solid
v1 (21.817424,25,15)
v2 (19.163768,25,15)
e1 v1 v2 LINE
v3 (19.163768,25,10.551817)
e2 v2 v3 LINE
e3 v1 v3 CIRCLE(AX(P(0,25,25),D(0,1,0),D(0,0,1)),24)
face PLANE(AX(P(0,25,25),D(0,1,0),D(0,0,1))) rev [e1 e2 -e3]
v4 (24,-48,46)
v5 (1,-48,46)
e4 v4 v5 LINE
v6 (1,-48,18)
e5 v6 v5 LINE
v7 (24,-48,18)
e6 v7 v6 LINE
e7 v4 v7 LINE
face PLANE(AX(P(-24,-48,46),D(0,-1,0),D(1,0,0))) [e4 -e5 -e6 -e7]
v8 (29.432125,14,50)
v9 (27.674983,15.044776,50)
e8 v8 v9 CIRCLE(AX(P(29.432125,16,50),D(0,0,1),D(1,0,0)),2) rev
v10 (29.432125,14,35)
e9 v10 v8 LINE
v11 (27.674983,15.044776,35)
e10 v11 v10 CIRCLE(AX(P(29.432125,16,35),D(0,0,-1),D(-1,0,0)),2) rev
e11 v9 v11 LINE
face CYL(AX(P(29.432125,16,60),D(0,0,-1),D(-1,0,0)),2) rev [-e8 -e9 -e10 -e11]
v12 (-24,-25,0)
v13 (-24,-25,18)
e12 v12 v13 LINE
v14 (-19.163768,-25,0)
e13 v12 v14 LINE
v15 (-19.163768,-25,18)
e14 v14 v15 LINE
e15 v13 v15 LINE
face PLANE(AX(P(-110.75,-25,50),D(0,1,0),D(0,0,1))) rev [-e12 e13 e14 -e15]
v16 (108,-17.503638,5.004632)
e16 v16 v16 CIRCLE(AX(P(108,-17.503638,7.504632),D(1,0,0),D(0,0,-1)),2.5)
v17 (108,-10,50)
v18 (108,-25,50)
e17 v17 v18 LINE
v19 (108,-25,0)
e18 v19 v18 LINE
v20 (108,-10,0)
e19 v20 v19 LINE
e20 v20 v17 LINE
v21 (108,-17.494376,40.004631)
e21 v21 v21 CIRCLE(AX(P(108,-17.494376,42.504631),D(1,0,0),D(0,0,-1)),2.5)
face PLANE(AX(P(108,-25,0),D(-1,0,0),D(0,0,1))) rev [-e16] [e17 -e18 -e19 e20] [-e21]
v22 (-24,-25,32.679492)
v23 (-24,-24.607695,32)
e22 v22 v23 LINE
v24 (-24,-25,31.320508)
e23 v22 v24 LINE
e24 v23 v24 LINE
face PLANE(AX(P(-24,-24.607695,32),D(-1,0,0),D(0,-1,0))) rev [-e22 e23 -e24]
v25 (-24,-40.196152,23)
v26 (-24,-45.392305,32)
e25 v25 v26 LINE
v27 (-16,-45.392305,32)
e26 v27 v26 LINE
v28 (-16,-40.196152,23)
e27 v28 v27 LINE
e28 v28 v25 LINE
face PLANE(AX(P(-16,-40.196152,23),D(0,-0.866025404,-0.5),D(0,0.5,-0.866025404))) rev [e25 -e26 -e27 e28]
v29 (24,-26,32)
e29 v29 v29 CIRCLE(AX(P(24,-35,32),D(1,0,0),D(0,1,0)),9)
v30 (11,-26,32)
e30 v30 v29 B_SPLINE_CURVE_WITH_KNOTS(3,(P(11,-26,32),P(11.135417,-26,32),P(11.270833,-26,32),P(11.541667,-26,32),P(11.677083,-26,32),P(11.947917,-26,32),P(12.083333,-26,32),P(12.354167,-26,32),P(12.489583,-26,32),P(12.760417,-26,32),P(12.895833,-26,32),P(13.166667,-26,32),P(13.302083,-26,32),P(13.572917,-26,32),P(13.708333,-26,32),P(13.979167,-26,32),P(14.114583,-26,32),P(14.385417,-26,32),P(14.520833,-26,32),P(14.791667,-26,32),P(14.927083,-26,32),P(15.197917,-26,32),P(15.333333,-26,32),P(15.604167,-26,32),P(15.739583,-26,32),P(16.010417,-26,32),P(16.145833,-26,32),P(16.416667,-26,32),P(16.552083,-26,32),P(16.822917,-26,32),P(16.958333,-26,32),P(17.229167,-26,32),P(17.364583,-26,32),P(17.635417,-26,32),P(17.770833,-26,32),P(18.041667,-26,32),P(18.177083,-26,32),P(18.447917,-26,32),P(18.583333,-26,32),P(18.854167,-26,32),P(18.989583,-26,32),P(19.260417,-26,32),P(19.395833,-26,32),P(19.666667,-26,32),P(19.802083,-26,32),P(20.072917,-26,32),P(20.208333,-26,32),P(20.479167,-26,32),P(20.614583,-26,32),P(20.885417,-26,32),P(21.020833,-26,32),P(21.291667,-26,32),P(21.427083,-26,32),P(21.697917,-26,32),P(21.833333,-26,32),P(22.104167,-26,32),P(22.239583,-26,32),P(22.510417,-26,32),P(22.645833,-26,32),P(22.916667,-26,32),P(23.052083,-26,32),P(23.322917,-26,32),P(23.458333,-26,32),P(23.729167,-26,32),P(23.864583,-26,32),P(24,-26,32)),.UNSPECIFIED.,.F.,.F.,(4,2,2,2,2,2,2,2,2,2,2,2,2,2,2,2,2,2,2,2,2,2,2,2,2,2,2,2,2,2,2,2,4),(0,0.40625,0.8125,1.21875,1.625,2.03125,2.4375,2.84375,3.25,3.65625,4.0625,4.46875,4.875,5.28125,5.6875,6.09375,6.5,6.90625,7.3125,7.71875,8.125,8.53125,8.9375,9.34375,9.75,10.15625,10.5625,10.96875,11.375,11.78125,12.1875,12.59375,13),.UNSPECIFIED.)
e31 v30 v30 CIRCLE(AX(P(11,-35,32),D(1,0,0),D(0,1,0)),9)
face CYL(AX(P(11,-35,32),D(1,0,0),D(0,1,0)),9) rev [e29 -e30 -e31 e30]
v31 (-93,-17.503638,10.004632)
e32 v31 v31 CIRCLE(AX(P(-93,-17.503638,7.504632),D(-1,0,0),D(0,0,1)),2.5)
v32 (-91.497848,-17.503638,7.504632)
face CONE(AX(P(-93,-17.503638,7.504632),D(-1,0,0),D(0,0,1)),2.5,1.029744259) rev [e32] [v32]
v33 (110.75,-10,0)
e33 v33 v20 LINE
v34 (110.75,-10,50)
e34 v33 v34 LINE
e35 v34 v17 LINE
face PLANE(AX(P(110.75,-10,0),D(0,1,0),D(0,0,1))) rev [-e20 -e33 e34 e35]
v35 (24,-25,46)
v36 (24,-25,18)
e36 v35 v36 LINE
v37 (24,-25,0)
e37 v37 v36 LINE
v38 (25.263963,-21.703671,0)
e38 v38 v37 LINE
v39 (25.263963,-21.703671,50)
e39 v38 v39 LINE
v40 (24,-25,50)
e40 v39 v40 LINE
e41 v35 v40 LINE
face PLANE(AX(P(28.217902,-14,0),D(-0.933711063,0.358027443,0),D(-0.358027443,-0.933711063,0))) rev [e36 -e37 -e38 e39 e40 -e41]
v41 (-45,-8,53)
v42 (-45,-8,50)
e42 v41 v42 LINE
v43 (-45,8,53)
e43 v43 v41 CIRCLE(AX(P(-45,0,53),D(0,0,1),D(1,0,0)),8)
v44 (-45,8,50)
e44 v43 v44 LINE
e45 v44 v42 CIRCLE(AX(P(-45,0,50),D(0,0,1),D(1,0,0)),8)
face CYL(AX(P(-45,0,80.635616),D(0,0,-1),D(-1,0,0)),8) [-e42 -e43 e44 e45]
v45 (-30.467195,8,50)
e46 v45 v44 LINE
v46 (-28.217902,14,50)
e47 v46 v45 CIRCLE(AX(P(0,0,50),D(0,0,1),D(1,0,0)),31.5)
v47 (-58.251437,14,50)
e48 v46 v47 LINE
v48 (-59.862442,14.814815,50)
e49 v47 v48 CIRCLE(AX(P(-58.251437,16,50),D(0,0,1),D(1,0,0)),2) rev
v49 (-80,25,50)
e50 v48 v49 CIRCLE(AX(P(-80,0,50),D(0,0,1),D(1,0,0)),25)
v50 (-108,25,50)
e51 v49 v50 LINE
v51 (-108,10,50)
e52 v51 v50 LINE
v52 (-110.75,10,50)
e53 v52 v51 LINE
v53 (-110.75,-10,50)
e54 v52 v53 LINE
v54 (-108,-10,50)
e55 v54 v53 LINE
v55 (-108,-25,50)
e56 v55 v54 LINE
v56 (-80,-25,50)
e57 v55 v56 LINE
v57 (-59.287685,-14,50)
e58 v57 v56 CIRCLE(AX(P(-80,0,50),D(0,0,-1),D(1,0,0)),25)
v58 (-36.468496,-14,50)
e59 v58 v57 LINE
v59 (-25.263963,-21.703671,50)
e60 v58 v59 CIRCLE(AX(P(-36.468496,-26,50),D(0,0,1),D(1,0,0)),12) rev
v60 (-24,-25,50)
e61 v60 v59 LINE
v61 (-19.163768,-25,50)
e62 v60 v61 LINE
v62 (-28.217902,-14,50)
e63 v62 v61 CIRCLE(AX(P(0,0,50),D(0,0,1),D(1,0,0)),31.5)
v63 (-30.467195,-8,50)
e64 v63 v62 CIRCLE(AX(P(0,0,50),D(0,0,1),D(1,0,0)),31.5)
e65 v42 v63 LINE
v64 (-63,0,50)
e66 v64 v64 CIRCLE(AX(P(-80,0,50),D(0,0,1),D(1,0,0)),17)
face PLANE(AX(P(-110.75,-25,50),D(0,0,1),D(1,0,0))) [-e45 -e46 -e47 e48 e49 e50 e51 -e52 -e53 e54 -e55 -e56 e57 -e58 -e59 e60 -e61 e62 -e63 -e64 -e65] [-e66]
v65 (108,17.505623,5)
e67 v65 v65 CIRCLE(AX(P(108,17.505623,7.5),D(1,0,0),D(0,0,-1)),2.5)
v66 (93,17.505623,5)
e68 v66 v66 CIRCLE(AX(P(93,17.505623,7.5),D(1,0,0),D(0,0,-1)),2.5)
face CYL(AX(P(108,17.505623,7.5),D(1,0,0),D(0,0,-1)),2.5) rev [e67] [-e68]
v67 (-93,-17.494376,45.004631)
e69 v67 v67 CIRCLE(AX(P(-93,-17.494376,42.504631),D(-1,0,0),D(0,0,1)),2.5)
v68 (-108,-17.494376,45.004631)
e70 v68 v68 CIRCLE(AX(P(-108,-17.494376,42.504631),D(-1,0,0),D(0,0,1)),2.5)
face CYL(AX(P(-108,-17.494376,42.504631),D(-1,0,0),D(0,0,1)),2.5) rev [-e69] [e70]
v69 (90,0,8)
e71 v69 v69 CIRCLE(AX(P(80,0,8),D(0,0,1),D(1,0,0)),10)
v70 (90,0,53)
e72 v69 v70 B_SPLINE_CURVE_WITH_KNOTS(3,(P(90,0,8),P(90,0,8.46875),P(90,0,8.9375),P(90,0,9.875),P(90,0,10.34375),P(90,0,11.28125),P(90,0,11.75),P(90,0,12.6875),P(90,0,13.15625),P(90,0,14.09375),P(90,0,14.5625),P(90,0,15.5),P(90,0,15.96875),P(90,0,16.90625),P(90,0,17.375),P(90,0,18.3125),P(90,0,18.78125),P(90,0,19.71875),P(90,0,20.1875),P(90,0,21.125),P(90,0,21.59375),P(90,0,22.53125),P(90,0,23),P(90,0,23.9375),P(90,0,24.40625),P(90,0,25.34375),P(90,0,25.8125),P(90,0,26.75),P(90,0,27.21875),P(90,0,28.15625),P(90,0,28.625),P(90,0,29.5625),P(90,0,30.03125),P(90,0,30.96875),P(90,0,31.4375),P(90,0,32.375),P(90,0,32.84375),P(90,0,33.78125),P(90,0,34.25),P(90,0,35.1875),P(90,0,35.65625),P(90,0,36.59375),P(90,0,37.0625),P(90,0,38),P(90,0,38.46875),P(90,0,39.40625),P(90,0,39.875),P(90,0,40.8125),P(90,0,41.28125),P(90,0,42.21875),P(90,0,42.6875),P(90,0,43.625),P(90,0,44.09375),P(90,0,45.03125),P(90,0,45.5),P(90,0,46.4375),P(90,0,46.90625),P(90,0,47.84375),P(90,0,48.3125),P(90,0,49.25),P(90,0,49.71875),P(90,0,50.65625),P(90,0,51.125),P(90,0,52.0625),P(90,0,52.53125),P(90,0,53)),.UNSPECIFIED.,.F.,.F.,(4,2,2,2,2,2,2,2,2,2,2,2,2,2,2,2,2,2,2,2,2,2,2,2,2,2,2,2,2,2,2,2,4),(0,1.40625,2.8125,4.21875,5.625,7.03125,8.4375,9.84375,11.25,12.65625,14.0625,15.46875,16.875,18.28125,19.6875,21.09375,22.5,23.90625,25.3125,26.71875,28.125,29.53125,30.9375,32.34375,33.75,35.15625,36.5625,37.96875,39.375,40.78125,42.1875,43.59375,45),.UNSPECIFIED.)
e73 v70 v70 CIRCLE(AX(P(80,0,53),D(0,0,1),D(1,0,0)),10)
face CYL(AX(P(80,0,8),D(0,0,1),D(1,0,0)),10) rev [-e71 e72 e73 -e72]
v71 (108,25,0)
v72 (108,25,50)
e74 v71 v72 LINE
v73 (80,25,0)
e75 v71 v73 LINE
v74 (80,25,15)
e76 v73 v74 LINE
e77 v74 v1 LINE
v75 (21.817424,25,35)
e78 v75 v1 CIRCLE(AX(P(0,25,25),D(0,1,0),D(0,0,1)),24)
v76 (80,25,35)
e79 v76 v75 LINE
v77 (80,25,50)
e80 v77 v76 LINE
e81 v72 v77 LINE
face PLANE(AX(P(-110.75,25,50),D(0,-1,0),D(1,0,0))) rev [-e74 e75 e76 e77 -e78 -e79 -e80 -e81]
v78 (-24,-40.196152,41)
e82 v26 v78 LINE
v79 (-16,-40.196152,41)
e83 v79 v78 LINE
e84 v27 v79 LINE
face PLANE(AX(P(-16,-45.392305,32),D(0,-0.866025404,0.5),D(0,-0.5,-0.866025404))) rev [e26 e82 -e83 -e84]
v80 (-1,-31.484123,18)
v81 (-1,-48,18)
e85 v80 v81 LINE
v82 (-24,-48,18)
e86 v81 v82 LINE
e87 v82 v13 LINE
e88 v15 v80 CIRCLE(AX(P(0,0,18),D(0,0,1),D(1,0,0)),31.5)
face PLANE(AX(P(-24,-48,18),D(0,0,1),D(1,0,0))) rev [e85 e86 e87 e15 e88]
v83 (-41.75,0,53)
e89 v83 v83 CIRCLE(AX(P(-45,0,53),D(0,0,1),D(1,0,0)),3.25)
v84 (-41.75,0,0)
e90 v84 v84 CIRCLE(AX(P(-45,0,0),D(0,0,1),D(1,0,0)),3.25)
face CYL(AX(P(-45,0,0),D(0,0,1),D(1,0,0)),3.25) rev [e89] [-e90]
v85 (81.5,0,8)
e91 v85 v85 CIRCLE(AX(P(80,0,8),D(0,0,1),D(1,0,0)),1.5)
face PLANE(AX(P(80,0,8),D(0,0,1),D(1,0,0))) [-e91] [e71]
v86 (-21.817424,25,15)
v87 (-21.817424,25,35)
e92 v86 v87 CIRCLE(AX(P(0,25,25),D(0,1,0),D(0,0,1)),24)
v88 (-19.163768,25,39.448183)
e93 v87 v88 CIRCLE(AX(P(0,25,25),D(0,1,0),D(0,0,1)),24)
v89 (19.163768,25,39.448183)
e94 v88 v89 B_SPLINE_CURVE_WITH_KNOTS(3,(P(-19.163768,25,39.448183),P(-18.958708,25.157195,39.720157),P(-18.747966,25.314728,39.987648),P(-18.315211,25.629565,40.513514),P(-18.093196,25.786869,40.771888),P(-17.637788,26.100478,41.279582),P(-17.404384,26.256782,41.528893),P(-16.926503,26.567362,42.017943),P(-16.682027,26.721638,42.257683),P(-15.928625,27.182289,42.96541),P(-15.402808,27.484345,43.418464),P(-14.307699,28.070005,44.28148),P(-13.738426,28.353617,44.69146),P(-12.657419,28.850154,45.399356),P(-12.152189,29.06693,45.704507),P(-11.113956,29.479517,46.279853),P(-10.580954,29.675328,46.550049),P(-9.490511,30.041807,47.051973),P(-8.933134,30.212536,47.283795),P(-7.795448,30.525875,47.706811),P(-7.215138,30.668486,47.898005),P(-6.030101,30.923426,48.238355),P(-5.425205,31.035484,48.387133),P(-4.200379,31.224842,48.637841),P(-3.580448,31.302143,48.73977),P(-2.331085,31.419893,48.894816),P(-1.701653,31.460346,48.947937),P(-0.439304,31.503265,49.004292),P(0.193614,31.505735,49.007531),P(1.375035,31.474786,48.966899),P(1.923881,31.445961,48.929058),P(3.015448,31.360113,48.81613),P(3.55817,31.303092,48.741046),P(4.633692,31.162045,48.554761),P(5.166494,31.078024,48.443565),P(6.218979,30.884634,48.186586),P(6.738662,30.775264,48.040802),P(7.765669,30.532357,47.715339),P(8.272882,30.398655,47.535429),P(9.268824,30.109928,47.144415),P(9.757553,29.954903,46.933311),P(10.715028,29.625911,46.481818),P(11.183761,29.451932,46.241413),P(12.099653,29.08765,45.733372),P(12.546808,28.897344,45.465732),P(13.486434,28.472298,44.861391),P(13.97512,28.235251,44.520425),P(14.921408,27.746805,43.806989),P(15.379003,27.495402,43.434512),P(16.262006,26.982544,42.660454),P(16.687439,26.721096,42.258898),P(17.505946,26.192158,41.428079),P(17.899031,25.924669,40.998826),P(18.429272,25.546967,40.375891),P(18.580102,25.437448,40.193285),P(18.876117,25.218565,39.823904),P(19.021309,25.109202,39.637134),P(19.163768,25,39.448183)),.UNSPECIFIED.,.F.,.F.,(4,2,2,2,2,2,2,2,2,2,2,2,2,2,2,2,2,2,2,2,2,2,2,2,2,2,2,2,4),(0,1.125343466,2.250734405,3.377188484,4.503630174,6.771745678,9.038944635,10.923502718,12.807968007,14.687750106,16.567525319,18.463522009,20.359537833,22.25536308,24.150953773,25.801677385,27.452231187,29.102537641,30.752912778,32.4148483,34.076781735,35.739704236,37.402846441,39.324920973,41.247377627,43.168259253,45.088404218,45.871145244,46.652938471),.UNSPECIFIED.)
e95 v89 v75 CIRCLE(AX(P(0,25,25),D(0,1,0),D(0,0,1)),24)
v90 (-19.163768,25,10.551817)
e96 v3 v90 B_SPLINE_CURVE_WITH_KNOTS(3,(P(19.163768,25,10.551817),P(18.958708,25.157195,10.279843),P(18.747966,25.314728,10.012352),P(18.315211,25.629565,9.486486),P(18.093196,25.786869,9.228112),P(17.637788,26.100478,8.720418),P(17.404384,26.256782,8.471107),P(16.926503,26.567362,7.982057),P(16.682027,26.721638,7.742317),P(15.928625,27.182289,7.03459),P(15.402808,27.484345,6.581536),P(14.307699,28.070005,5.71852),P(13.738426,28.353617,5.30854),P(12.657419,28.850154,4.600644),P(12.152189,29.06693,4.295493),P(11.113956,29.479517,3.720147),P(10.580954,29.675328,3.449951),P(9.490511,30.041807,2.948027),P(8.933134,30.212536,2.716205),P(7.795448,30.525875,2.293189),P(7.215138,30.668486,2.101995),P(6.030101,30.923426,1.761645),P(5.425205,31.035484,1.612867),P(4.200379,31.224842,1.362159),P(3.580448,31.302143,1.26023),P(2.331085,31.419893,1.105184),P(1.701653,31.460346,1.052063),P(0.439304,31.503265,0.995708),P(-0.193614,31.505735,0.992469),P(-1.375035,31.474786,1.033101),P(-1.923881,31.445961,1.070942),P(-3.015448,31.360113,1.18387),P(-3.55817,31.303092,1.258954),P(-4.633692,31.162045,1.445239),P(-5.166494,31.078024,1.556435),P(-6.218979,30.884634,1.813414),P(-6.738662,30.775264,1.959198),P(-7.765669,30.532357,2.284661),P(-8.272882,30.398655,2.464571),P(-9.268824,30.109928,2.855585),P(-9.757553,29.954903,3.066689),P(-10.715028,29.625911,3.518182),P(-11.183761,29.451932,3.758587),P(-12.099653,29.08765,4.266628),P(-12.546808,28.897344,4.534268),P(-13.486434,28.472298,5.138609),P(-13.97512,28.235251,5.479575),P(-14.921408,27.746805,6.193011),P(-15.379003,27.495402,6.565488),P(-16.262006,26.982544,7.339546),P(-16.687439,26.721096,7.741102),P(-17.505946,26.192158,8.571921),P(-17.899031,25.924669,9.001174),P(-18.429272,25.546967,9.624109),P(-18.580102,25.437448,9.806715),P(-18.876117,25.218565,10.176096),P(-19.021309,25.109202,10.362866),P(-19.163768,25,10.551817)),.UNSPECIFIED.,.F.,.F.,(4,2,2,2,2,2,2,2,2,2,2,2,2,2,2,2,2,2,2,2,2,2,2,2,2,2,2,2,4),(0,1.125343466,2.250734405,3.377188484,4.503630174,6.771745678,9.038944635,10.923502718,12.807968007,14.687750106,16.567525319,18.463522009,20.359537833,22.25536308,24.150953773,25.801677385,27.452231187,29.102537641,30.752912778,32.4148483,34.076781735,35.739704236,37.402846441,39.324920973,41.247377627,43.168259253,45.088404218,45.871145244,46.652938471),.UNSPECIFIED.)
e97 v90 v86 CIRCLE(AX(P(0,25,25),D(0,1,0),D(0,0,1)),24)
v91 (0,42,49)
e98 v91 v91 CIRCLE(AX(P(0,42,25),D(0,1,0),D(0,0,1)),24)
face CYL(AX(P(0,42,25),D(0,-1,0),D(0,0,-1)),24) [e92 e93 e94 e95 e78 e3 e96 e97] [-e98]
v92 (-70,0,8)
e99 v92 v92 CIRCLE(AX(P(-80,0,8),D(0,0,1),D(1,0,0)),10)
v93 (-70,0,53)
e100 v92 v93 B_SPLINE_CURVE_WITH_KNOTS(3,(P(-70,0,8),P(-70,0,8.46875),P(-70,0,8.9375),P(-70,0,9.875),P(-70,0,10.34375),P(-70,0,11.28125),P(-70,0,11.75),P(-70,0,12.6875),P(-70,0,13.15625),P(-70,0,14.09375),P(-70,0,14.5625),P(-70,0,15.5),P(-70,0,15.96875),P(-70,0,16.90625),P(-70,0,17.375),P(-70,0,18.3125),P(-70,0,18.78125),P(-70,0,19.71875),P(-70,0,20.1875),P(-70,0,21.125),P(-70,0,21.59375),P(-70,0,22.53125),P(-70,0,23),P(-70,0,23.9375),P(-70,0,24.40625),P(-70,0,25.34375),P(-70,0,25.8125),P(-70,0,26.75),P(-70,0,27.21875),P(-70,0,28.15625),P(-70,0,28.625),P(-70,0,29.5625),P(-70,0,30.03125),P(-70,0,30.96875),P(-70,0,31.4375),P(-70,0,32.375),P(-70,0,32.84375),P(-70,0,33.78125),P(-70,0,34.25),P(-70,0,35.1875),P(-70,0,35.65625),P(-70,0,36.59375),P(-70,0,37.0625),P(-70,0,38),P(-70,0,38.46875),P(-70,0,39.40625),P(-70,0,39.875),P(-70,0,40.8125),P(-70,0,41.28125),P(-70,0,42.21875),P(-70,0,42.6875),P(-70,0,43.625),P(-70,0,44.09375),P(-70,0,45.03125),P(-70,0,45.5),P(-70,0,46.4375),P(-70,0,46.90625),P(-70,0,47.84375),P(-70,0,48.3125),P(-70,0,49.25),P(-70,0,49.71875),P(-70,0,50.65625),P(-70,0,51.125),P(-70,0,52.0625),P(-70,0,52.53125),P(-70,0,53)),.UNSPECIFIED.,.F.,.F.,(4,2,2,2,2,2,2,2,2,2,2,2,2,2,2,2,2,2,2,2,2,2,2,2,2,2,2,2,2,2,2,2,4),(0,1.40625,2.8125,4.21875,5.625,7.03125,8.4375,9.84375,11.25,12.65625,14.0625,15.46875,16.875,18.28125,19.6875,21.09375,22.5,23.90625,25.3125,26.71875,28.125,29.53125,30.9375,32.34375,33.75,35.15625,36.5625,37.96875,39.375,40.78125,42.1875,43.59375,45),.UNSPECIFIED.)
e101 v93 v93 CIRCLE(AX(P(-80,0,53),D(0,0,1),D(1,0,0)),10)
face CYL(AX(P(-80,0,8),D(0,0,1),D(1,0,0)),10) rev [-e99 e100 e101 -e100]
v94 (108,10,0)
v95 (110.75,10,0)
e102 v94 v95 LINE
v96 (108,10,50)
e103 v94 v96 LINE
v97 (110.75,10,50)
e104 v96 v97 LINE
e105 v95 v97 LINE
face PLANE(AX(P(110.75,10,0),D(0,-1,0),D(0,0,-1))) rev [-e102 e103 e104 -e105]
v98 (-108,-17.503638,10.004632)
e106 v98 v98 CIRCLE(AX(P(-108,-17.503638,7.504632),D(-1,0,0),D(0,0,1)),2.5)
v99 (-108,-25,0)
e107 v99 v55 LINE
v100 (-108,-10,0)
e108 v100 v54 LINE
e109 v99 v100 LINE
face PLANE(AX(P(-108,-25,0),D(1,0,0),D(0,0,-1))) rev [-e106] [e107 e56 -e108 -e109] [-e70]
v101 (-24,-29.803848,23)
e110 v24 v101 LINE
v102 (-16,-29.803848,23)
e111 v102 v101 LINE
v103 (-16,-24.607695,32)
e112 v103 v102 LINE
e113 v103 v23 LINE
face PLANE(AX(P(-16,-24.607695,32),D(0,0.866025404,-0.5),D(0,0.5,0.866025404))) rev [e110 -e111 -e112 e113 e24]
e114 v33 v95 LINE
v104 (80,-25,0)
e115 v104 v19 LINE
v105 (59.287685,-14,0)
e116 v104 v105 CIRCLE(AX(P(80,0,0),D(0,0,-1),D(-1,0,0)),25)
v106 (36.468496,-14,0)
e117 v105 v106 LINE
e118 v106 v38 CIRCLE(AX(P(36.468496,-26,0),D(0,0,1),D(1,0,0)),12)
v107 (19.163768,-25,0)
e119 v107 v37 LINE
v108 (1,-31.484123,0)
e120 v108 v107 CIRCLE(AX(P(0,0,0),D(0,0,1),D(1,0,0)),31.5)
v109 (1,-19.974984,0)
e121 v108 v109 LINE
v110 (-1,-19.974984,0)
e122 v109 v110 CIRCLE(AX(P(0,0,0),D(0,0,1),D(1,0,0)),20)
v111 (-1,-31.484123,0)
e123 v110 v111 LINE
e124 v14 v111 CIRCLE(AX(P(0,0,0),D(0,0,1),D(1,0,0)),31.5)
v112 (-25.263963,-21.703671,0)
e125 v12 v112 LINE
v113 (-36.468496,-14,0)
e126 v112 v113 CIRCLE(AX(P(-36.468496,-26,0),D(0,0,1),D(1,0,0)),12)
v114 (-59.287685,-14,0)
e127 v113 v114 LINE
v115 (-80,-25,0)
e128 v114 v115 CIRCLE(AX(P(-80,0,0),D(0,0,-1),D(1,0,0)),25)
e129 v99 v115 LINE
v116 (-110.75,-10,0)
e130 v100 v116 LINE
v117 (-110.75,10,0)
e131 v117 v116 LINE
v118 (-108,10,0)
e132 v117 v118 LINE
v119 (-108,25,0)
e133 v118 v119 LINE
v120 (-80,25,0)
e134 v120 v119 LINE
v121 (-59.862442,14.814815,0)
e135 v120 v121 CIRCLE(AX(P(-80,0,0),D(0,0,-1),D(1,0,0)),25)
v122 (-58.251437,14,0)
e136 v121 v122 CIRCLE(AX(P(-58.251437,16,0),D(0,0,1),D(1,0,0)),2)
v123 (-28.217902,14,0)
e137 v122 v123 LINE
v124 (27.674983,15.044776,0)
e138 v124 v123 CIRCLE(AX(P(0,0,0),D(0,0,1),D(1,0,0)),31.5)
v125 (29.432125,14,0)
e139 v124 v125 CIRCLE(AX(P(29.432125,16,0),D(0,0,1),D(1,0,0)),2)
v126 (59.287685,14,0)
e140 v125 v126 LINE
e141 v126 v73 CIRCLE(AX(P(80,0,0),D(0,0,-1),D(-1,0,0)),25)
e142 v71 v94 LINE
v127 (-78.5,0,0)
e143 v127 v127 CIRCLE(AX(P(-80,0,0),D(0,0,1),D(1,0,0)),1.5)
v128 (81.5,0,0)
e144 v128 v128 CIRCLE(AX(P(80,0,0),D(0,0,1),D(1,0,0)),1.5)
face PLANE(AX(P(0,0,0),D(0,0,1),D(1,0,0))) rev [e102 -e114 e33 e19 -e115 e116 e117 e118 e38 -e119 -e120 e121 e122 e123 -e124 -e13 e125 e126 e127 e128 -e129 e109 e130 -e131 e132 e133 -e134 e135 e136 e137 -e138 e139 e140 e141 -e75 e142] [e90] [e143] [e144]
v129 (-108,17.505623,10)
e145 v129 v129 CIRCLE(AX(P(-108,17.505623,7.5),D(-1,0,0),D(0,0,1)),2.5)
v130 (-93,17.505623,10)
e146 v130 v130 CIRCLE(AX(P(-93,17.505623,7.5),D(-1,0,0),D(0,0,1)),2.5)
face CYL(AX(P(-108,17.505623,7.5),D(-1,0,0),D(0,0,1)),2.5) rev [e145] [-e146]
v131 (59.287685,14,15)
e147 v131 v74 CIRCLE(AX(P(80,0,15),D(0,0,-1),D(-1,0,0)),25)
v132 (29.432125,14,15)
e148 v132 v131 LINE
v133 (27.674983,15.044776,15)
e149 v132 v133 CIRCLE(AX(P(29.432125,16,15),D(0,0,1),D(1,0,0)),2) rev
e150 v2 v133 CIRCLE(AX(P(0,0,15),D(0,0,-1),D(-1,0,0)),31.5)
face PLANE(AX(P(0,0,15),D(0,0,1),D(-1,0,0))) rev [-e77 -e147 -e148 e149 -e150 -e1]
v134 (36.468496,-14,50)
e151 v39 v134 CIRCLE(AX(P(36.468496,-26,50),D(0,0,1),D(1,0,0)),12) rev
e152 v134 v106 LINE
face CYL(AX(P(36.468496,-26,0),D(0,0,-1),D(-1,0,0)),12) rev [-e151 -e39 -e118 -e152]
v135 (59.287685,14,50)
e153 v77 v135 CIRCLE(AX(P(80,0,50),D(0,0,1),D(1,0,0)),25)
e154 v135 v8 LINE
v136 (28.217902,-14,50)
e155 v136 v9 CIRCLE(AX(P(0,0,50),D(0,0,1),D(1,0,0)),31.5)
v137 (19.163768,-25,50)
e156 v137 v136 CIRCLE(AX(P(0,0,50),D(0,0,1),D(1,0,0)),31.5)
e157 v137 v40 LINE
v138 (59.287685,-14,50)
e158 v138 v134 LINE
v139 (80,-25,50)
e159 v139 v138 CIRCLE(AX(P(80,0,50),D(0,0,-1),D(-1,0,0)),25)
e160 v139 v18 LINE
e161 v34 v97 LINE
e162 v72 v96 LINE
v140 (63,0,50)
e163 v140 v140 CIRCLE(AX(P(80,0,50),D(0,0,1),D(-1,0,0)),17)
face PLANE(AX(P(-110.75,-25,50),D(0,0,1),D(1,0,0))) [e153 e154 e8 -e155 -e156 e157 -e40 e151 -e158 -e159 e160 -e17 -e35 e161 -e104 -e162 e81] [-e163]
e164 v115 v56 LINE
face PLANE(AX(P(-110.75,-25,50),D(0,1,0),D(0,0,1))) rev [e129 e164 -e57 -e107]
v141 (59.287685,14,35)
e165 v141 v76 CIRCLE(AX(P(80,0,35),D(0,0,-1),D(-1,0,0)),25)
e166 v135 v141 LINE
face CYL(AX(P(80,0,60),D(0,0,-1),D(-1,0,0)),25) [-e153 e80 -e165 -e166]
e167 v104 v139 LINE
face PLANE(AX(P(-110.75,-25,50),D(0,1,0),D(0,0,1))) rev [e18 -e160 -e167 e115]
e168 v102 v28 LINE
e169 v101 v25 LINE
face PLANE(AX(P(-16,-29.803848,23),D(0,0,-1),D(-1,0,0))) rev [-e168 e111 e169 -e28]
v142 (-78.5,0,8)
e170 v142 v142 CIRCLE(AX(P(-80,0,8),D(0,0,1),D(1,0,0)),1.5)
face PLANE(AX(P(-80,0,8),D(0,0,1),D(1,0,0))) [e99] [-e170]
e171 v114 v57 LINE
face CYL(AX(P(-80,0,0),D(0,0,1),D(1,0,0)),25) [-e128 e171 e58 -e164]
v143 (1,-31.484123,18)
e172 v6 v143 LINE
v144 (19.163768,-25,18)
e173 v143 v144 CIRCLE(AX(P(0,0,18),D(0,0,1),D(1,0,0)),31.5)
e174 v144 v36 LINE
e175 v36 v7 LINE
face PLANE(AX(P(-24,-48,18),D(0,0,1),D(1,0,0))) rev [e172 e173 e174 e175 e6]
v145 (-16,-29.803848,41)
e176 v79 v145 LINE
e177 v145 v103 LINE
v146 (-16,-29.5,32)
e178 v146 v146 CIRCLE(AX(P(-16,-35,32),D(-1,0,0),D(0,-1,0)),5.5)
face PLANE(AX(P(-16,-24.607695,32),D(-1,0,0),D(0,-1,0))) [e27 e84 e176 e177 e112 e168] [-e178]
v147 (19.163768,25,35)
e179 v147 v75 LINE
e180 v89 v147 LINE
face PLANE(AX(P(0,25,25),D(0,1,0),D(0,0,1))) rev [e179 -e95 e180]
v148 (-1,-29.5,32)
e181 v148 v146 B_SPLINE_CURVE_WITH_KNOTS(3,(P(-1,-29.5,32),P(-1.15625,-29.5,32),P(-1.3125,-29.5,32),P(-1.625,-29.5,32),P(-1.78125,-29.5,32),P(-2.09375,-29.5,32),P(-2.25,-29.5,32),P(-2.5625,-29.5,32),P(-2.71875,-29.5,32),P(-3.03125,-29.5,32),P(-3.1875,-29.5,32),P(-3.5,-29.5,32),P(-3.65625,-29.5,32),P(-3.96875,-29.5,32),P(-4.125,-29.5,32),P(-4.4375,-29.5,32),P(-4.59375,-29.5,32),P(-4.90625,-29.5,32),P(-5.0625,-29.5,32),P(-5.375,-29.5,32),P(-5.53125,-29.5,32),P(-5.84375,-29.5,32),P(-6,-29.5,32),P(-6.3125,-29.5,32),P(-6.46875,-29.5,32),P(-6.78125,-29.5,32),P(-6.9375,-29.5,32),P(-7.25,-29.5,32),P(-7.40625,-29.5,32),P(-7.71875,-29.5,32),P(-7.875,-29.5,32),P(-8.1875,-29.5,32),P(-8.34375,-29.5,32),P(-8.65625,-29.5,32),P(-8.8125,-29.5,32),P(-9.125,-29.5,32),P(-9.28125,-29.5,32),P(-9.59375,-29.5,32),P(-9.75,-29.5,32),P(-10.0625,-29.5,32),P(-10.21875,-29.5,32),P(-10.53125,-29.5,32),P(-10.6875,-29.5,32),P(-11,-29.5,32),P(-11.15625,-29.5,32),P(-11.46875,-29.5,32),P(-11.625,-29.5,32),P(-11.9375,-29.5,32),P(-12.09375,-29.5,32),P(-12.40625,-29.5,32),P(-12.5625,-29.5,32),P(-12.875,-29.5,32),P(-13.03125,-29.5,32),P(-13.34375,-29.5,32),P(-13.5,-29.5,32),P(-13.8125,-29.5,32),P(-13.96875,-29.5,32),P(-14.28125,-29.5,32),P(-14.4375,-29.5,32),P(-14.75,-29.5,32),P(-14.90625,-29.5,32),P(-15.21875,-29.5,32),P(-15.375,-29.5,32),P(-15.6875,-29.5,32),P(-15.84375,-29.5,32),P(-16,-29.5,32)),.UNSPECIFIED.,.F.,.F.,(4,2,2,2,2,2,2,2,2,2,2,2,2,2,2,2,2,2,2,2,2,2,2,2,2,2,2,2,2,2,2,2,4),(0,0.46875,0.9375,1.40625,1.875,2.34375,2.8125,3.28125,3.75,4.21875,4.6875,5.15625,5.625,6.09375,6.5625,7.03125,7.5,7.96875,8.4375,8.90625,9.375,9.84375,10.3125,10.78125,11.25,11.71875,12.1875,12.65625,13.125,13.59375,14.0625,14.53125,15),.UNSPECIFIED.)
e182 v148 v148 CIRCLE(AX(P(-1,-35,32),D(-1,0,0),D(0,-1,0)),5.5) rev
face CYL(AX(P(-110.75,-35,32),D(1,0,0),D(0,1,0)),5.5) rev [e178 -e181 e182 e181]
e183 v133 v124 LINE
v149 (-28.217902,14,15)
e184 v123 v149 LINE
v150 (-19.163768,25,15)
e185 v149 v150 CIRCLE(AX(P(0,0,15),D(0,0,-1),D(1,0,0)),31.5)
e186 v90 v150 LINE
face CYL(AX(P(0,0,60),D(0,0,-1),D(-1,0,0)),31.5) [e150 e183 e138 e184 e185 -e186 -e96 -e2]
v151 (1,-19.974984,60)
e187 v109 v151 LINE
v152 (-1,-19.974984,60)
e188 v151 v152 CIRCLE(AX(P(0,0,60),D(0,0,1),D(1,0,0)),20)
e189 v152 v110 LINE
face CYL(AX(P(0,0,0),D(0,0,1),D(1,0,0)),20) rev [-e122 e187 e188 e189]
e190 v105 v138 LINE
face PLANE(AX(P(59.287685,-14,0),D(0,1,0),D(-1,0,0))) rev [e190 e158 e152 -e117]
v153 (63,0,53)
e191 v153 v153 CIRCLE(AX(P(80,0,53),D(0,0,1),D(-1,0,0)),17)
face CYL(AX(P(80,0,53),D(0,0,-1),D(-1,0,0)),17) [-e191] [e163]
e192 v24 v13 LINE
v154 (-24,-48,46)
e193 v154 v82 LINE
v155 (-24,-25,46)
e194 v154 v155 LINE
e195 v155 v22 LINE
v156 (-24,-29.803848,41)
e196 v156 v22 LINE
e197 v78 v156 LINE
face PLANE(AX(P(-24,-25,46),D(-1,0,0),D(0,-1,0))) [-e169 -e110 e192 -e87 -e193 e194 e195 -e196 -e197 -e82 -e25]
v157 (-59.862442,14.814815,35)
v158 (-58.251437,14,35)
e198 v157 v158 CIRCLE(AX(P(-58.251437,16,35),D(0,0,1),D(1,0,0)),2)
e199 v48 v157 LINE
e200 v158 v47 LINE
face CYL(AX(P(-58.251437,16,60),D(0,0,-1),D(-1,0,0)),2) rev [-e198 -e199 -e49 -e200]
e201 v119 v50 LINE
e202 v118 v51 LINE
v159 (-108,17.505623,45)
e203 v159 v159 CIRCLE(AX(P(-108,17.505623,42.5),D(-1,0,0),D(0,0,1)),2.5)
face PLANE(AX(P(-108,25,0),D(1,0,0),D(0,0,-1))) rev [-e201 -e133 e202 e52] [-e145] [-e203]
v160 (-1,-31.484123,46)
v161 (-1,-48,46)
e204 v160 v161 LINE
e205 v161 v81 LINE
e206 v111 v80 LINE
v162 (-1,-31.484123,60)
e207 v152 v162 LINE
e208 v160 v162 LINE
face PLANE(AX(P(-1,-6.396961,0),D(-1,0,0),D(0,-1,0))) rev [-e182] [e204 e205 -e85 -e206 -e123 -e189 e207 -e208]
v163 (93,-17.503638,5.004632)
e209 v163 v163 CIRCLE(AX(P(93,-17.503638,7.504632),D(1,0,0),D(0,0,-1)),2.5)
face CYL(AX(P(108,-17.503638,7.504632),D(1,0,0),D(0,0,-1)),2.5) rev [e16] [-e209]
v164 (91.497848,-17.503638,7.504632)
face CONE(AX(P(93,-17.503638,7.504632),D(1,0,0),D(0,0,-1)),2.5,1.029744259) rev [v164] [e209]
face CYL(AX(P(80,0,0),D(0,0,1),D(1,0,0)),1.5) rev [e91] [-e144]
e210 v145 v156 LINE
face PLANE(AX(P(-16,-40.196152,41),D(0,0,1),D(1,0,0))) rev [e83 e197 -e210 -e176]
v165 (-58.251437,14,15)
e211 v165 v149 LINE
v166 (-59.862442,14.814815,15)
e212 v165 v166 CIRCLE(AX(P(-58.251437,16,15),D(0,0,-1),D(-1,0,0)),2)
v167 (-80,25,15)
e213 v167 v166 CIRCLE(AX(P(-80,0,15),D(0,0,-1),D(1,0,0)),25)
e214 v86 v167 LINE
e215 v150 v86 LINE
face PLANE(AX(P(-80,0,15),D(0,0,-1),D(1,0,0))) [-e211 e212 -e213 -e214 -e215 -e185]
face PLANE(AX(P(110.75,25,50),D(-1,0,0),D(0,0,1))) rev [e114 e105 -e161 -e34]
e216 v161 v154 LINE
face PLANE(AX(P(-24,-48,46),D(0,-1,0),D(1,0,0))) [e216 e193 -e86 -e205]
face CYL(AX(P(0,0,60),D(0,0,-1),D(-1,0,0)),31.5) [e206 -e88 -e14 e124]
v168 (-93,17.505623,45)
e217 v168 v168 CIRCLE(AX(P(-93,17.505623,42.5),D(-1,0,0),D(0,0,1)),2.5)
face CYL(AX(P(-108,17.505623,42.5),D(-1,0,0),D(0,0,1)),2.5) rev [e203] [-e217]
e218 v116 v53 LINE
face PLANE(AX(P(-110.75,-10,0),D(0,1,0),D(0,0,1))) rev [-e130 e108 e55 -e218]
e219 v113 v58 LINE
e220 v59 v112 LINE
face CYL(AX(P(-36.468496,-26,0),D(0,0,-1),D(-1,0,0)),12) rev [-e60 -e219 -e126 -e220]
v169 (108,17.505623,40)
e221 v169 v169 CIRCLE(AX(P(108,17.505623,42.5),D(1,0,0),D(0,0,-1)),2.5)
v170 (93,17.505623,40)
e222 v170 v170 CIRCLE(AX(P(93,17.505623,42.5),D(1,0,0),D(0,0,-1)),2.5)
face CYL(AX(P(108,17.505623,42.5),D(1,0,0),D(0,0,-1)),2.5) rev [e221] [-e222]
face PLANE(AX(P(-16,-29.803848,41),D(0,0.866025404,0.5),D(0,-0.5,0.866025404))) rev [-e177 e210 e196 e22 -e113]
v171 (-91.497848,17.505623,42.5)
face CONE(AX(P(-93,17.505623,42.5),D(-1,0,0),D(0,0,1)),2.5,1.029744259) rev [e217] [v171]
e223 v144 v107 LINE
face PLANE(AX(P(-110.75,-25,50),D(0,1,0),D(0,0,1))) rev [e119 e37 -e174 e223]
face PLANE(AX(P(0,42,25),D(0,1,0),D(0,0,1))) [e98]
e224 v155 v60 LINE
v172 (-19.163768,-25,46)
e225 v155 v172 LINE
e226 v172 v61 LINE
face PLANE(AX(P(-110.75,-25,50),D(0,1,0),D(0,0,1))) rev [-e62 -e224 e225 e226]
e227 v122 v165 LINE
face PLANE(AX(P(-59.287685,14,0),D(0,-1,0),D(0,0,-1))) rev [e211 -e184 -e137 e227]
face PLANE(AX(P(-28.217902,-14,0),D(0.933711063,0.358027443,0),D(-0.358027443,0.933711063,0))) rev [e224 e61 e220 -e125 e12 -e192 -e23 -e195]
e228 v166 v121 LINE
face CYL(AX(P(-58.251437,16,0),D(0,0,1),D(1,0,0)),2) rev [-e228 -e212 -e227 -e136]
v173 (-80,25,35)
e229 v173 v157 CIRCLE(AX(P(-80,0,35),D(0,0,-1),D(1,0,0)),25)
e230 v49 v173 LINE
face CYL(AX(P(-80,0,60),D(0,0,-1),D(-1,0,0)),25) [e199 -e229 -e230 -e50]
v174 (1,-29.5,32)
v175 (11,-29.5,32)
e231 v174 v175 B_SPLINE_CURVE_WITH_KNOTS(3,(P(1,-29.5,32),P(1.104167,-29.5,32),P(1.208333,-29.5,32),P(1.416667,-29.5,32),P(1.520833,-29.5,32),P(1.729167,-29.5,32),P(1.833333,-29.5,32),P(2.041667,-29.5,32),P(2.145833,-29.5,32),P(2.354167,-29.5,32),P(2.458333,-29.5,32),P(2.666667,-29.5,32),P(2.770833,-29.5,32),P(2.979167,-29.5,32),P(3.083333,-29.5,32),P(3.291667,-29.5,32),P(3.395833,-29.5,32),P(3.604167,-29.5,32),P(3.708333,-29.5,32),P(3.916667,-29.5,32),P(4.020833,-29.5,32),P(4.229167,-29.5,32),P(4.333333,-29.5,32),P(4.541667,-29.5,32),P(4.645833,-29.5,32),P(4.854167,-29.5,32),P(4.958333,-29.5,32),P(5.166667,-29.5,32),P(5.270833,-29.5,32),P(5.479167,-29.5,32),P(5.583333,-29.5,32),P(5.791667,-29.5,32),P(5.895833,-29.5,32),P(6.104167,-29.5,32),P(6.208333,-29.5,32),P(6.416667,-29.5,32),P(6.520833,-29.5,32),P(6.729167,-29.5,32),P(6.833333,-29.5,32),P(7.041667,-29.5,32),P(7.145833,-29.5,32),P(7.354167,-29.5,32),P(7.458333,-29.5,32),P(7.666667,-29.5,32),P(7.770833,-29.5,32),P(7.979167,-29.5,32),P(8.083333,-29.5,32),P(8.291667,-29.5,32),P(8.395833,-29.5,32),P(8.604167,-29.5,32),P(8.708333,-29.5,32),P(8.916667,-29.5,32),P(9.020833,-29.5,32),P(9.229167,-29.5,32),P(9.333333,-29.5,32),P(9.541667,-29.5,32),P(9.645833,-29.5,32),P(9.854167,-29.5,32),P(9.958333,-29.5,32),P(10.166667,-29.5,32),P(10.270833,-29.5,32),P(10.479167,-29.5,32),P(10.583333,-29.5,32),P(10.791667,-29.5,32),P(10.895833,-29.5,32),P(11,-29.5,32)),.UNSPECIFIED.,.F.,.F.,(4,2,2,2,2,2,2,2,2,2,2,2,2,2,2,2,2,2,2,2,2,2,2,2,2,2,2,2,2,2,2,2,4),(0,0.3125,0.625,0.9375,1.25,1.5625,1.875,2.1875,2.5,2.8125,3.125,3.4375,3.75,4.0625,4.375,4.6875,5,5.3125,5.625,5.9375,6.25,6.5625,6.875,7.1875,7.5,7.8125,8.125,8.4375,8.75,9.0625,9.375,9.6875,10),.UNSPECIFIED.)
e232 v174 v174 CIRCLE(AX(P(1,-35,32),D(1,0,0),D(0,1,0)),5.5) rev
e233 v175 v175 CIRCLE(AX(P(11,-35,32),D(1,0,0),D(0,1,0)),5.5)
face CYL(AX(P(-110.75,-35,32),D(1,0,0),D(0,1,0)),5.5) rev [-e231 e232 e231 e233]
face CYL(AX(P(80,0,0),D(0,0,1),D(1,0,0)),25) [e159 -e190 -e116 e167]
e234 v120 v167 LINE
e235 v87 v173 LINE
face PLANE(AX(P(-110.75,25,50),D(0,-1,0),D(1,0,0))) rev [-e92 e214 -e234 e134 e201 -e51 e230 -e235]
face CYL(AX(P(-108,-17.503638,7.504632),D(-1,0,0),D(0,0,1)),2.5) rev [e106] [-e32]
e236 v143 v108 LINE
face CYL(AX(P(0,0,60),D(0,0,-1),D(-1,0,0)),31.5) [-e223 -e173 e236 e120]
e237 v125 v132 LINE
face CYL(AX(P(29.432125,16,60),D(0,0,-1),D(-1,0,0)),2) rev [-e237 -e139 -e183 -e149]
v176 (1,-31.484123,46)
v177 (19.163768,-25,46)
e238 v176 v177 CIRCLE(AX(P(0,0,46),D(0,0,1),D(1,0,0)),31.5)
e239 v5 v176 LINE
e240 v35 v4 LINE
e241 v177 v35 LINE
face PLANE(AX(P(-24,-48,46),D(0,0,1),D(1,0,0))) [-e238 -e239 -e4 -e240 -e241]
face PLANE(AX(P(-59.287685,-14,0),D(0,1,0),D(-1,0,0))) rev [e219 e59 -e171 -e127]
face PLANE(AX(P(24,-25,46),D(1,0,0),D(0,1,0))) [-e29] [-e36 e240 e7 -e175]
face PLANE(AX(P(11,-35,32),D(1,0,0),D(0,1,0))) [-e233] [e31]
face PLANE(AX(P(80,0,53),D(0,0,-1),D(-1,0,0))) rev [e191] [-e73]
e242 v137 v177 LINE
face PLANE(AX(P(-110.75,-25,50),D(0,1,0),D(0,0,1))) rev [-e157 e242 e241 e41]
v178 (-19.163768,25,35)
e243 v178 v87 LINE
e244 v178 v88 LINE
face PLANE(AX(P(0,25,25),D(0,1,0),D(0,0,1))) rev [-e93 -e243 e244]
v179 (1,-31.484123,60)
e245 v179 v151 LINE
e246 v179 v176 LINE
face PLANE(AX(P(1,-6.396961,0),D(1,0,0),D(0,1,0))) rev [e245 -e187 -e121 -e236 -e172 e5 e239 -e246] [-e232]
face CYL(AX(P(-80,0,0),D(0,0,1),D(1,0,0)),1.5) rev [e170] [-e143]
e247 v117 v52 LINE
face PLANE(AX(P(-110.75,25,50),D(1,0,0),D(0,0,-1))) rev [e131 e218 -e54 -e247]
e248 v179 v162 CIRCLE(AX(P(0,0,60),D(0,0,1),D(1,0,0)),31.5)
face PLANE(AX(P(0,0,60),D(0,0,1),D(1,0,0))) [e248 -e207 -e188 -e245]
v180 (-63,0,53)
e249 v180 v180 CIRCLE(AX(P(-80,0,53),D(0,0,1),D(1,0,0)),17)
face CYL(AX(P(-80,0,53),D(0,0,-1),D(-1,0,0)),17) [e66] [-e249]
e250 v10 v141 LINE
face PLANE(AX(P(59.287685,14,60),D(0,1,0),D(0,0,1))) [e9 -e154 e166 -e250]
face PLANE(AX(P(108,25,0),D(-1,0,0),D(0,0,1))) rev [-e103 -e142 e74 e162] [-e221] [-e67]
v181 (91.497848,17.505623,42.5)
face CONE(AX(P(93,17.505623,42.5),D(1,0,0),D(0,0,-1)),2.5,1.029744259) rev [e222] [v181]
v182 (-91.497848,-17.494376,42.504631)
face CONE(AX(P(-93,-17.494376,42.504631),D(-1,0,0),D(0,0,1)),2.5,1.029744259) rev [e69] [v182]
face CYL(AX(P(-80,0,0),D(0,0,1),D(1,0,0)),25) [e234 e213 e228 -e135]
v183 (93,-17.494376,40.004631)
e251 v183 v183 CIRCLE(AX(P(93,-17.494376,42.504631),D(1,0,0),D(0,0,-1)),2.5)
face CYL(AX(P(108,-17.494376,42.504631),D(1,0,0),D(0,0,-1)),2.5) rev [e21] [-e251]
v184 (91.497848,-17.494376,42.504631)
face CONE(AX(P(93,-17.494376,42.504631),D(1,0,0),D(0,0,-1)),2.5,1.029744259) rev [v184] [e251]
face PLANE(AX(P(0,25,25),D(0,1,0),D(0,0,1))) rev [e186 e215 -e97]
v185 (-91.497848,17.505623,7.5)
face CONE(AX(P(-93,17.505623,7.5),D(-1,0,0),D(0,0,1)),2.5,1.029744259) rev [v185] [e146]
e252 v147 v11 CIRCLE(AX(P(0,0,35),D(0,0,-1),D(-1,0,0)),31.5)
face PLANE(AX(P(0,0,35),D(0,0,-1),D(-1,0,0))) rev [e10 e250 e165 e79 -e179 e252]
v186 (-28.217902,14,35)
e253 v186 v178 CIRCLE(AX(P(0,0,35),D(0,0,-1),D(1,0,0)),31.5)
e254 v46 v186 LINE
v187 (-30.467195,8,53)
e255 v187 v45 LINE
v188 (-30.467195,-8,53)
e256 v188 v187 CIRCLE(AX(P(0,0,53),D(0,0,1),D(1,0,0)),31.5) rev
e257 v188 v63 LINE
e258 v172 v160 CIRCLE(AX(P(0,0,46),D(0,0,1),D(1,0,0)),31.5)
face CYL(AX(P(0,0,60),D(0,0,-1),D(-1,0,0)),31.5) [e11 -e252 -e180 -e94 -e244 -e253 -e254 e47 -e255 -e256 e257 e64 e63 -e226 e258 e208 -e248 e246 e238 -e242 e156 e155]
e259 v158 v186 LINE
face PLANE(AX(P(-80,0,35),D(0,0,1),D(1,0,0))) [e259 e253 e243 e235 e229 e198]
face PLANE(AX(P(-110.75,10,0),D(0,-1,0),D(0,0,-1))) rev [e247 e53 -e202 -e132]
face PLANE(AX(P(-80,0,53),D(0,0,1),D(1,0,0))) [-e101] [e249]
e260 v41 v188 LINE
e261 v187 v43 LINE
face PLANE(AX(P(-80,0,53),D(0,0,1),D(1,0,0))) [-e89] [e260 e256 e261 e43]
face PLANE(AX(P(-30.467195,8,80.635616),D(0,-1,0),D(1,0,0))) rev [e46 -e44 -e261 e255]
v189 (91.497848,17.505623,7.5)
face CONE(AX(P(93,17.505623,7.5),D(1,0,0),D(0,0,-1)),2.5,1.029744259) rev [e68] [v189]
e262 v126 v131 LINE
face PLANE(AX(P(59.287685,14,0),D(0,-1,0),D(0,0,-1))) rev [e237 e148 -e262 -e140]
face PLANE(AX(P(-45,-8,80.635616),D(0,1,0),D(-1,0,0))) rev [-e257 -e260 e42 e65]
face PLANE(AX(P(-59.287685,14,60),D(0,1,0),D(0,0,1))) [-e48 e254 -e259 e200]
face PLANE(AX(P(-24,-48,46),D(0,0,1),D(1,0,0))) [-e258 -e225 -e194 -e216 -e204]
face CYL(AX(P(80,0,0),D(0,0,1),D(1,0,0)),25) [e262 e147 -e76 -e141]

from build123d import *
from build123d.topology import SkipClean

# Parameters (mm, degrees)
SKETCH_1_R           = 31.5
EXTRUDE_1_DEPTH      = 60
SKETCH_4_W           = 221.5
SKETCH_4_H           = 50
EXTRUDE_2_DEPTH      = 50
SKETCH_5_W           = 2.75
SKETCH_5_H           = 15
CUT_EXTRUDE_1_DEPTH  = 126.530125866
SKETCH_6_R           = 17
EXTRUDE_3_DEPTH      = 3
SKETCH_7_R           = 10
CUT_EXTRUDE_2_DEPTH  = 45
SKETCH_8_R           = 1.5
CUT_EXTRUDE_3_DEPTH  = 127.340066883
EXTRUDE_4_DEPTH      = 3
SKETCH_10_R          = 3.25
CUT_EXTRUDE_4_DEPTH  = 127.754930871
CUT_EXTRUDE_5_DEPTH  = 121.344557417
SKETCH_12_R          = 24
EXTRUDE_5_DEPTH      = 17
SKETCH_13_W          = 48
SKETCH_13_H          = 23
EXTRUDE_6_DEPTH      = 28
CUT_EXTRUDE_6_DEPTH  = 131.65053582
FILLET_1_R           = 12
CUT_EXTRUDE_7_DEPTH  = 8
SKETCH_17_R          = 9
CUT_EXTRUDE_8_DEPTH  = 13
SKETCH_18_R          = 5.5
CUT_EXTRUDE_9_DEPTH  = 144.968963711
SKETCH_19_R          = 20
CUT_EXTRUDE_10_DEPTH = 135.794519592
SKETCH_20_W          = 2
SKETCH_20_H          = 52.086738744
CUT_EXTRUDE_11_DEPTH = 135.794519592
M6X1_0_1_AT_2_COUNT  = 2
M6X1_0_1_AT_2_PITCH  = 35
M6X1_0_1_AT_3_COUNT  = 2
M6X1_0_1_AT_3_PITCH  = 49.500749042
M6X1_0_1_AT_4_COUNT  = 2
M6X1_0_1_AT_4_PITCH  = 35
FILLET_2_R           = 2


with BuildPart() as part:
    # 草图1 → 凸台-拉伸1 (new body)
    with BuildSketch(Plane.XY):
        Circle(SKETCH_1_R)
    extrude(amount=EXTRUDE_1_DEPTH)

    # 草图4 → 凸台-拉伸2 (add)
    with BuildSketch(Plane.XY):
        Rectangle(SKETCH_4_W, SKETCH_4_H)
    extrude(amount=EXTRUDE_2_DEPTH)

    # 草图5 → 切除-拉伸1 (cut, through all)
    with BuildSketch(Plane.XY.offset(50)):
        with Locations((-109.375, 17.5)):
            Rectangle(SKETCH_5_W, SKETCH_5_H)
        with Locations((-109.375, -17.5)):
            Rectangle(SKETCH_5_W, SKETCH_5_H)
        with Locations((109.375, -17.5)):
            Rectangle(SKETCH_5_W, SKETCH_5_H)
        with Locations((109.375, 17.5)):
            Rectangle(SKETCH_5_W, SKETCH_5_H)
    extrude(amount=-CUT_EXTRUDE_1_DEPTH, mode=Mode.SUBTRACT)

    # 草图6 → 凸台-拉伸3 (add)
    with BuildSketch(Plane.XY.offset(50)):
        with Locations((-80, 0)):
            Circle(SKETCH_6_R)
        with Locations(Location((80, 0, 0), (0, 0, 180))):
            Circle(SKETCH_6_R)
    extrude(amount=EXTRUDE_3_DEPTH)

    # 草图7 → 切除-拉伸2 (cut)
    with BuildSketch(Plane.XY.offset(53)):
        with Locations((-80, 0)):
            Circle(SKETCH_7_R)
        with Locations((80, 0)):
            Circle(SKETCH_7_R)
    extrude(amount=-CUT_EXTRUDE_2_DEPTH, mode=Mode.SUBTRACT)

    # 草图8 → 切除-拉伸3 (cut, through all)
    with BuildSketch(Plane.XY.offset(8)):
        with Locations((-80, 0)):
            Circle(SKETCH_8_R)
        with Locations((80, 0)):
            Circle(SKETCH_8_R)
    extrude(amount=-CUT_EXTRUDE_3_DEPTH, mode=Mode.SUBTRACT)

    # 草图9 → 凸台-拉伸4 (add)
    with BuildSketch(Plane.XY.offset(50)):
        with BuildLine():
            Line((-30.467195473, 8), (-45, 8))
            ThreePointArc((-45, 8), (-53, 0), (-45, -8))
            Line((-45, -8), (-30.467195473, -8))
            ThreePointArc((-30.467195473, -8), (-31.5, 0), (-30.467195473, 8))
        make_face()
    extrude(amount=EXTRUDE_4_DEPTH)

    # 草图10 → 切除-拉伸4 (cut, through all)
    with BuildSketch(Plane.XY.offset(53)):
        with Locations((-45, 0)):
            Circle(SKETCH_10_R)
    extrude(amount=-CUT_EXTRUDE_4_DEPTH, mode=Mode.SUBTRACT)

    # 草图11 → 切除-拉伸5 (cut, through all)
    with SkipClean():  # the faces are left unmerged after this step: merging them gives an invalid solid
        with BuildSketch(Plane.XY.offset(35)):
            with BuildLine():
                Line((-59.287684823, 14), (-28.217902119, 14))
                ThreePointArc((-28.217902119, 14), (-24.320889444, 20.018599767), (-19.163767897, 25))
                Line((-19.163767897, 25), (-80, 25))
                ThreePointArc((-80, 25), (-68.2739606, 22.079402166), (-59.287684823, 14))
            make_face()
            with BuildLine():
                Line((80, 25), (19.163767897, 25))
                ThreePointArc((19.163767897, 25), (24.320889444, 20.018599767), (28.217902119, 14))
                Line((28.217902119, 14), (59.287684823, 14))
                ThreePointArc((59.287684823, 14), (68.2739606, 22.079402166), (80, 25))
            make_face()
        cut_extrude_5 = extrude(amount=CUT_EXTRUDE_5_DEPTH, mode=Mode.SUBTRACT)

    # 镜向1: 切除-拉伸5 across plane
    with SkipClean():  # the faces are left unmerged after this step: merging them gives an invalid solid
        add(cut_extrude_5.mirror(Plane(origin=(0, 0, 25), x_dir=(1, 0, 0), z_dir=(0, 0, -1))), mode=Mode.SUBTRACT)
    add(part.part.scale(1), mode=Mode.REPLACE)  # the faces are merged on a copy

    # 草图12 → 凸台-拉伸5 (add)
    with BuildSketch(Plane(origin=(0, 25, 0), x_dir=(1, 0, 0), z_dir=(0, 1, 0))):
        with Locations(Location((0, -25, 0), (0, 0, 37.013819742))):
            Circle(SKETCH_12_R)
    extrude(amount=EXTRUDE_5_DEPTH)

    # 草图13 → 凸台-拉伸6 (add)
    with BuildSketch(Plane(origin=(0, 0, 18), x_dir=(-1, 0, 0), z_dir=(0, 0, -1))):
        with Locations((0, -36.5)):
            Rectangle(SKETCH_13_W, SKETCH_13_H)
    extrude(amount=-EXTRUDE_6_DEPTH)

    # 草图14 → 切除-拉伸6 (cut, through all)
    with BuildSketch(Plane.XY.offset(50)):
        with BuildLine():
            Line((-80, -25), (-24, -25))
            Line((-24, -25), (-28.217902119, -14))
            Line((-28.217902119, -14), (-59.287684823, -14))
            ThreePointArc((-59.287684823, -14), (-68.2739606, -22.079402166), (-80, -25))
        make_face()
        with BuildLine():
            Line((28.217902119, -14), (24, -25))
            Line((24, -25), (80, -25))
            ThreePointArc((80, -25), (68.2739606, -22.079402166), (59.287684823, -14))
            Line((59.287684823, -14), (28.217902119, -14))
        make_face()
    extrude(amount=-CUT_EXTRUDE_6_DEPTH, mode=Mode.SUBTRACT)

    # 圆角1
    # the kernel refuses this fillet: 12 mm, written as the material it adds along each edge
    with BuildSketch(Plane(origin=(-28.217902119, -14, 50), x_dir=(0.3580274430169819, -0.9337110634702374, 0), z_dir=(0, 0, -1)), Plane(origin=(28.217902119, -14, 50), x_dir=(1, 0, 0), z_dir=(0, 0, -1))) as fillet_1_piece_1:
        with BuildLine():
            CenterArc((FILLET_1_R * 0.687549480882, FILLET_1_R), FILLET_1_R, 200.979103866, 69.020896134)
            Line((-FILLET_1_R * 0.246161582588, FILLET_1_R * 0.641972556983), (0, 0))
            Line((0, 0), (FILLET_1_R * 0.687549480882, 0))
        make_face()
    extrude(amount=50)

    # 草图15 → 切除-拉伸7 (cut)
    with BuildSketch(Plane.ZY.offset(24)):
        Polygon((32, -24.607695155), (23, -29.803847577), (23, -40.196152423), (32, -45.392304845), (41, -40.196152423), (41, -29.803847577), align=None)
    extrude(amount=-CUT_EXTRUDE_7_DEPTH, mode=Mode.SUBTRACT)

    # 草图17 → 切除-拉伸8 (cut)
    with BuildSketch(Plane(origin=(24, 0, 0), x_dir=(0, 0, -1), z_dir=(1, 0, 0))):
        with Locations(Location((-32, -35, 0), (0, 0, 90))):
            Circle(SKETCH_17_R)
    extrude(amount=-CUT_EXTRUDE_8_DEPTH, mode=Mode.SUBTRACT)

    # 草图18 → 切除-拉伸9 (cut, through all)
    with BuildSketch(Plane(origin=(11, 0, 0), x_dir=(0, 0, -1), z_dir=(1, 0, 0))):
        with Locations(Location((-32, -35, 0), (0, 0, 90))):
            Circle(SKETCH_18_R)
    extrude(amount=-CUT_EXTRUDE_9_DEPTH, mode=Mode.SUBTRACT)

    # 草图19 → 切除-拉伸10 (cut, through all)
    with BuildSketch(Plane.XY.offset(60)):
        Circle(SKETCH_19_R)
    extrude(amount=-CUT_EXTRUDE_10_DEPTH, mode=Mode.SUBTRACT)

    # 草图20 → 切除-拉伸11 (cut, through all)
    with BuildSketch(Plane.XY.offset(60)):
        with Locations((0, -32.440330594)):
            Rectangle(SKETCH_20_W, SKETCH_20_H)
    extrude(amount=-CUT_EXTRUDE_11_DEPTH, mode=Mode.SUBTRACT)

    # 草图21 → M6x1.0 螺纹孔1 (revolve, cut)
    with BuildSketch(Plane(origin=(-108, 17.505623263, 42.5), x_dir=(0, 0, 1), z_dir=(0, 1, 0))):
        Polygon((0, 0), (0, 16.502151548), (2.5, 15), (2.5, 0), align=None)
    m6x1_0_1 = revolve(axis=Axis((-114.35, 17.505623263, 42.5), (1, 0, 0)), mode=Mode.SUBTRACT)

    # M6x1.0 螺纹孔1 at 2: M6x1.0 螺纹孔1 ×2
    with Locations(*[(0, 0, -i * M6X1_0_1_AT_2_PITCH) for i in range(1, M6X1_0_1_AT_2_COUNT)]):
        add(m6x1_0_1, mode=Mode.SUBTRACT)

    # M6x1.0 螺纹孔1 at 3: M6x1.0 螺纹孔1 ×2
    with Locations(*[Vector(0, -0.7072471015902798, -0.7069664329316834) * (i * M6X1_0_1_AT_3_PITCH) for i in range(1, M6X1_0_1_AT_3_COUNT)]):
        add(m6x1_0_1, mode=Mode.SUBTRACT)

    # M6x1.0 螺纹孔1 at 4: M6x1.0 螺纹孔1 ×2
    with Locations(*[Vector(0, -0.9999999912472337, 0.0001323084749892749) * (i * M6X1_0_1_AT_4_PITCH) for i in range(1, M6X1_0_1_AT_4_COUNT)]):
        add(m6x1_0_1, mode=Mode.SUBTRACT)

    # 镜向2: M6x1.0 螺纹孔1 across plane
    add(m6x1_0_1.mirror(Plane(origin=(0, 0, 0), x_dir=(0, 0, 1), z_dir=(1, 0, 0))), mode=Mode.SUBTRACT)

    # 镜向2 copy 1 sketch → 镜向2 copy 1 (revolve, cut)
    with BuildSketch(Plane(origin=(108, 17.505623263, 7.5), x_dir=(0, 0, 1), z_dir=(0, 1, 0))):
        Polygon((0, 0), (0, -16.502151548), (2.5, -15), (2.5, 0), align=None)
    revolve(axis=Axis((114.35, 17.505623263, 7.5), (1, 0, 0)), mode=Mode.SUBTRACT)

    # 镜向2 copy 2 sketch → 镜向2 copy 2 (revolve, cut)
    with BuildSketch(Plane(origin=(108, -17.503638023, 7.504632022), x_dir=(0, 0, 1), z_dir=(0, 1, 0))):
        Polygon((0, 0), (0, -16.502151548), (2.5, -15), (2.5, 0), align=None)
    revolve(axis=Axis((114.35, -17.503638023, 7.504632022), (1, 0, 0)), mode=Mode.SUBTRACT)

    # 镜向2 copy 3 sketch → 镜向2 copy 3 (revolve, cut)
    with BuildSketch(Plane(origin=(108, -17.49437643, 42.504630797), x_dir=(0, 0, 1), z_dir=(0, 1, 0))):
        Polygon((0, 0), (0, -16.502151548), (2.5, -15), (2.5, 0), align=None)
    revolve(axis=Axis((114.35, -17.49437643, 42.504630797), (1, 0, 0)), mode=Mode.SUBTRACT)

    # 圆角2
    fillet_2_edges = [part.edges().sort_by_distance(p)[0] for p in [
        (28.217902119, 14, 42.5),
        (-59.287684823, 14, 42.5),
        (28.217902119, 14, 7.5),
        (-59.287684823, 14, 7.5),
    ]]
    fillet(fillet_2_edges, radius=FILLET_2_R)


solid = part.part
